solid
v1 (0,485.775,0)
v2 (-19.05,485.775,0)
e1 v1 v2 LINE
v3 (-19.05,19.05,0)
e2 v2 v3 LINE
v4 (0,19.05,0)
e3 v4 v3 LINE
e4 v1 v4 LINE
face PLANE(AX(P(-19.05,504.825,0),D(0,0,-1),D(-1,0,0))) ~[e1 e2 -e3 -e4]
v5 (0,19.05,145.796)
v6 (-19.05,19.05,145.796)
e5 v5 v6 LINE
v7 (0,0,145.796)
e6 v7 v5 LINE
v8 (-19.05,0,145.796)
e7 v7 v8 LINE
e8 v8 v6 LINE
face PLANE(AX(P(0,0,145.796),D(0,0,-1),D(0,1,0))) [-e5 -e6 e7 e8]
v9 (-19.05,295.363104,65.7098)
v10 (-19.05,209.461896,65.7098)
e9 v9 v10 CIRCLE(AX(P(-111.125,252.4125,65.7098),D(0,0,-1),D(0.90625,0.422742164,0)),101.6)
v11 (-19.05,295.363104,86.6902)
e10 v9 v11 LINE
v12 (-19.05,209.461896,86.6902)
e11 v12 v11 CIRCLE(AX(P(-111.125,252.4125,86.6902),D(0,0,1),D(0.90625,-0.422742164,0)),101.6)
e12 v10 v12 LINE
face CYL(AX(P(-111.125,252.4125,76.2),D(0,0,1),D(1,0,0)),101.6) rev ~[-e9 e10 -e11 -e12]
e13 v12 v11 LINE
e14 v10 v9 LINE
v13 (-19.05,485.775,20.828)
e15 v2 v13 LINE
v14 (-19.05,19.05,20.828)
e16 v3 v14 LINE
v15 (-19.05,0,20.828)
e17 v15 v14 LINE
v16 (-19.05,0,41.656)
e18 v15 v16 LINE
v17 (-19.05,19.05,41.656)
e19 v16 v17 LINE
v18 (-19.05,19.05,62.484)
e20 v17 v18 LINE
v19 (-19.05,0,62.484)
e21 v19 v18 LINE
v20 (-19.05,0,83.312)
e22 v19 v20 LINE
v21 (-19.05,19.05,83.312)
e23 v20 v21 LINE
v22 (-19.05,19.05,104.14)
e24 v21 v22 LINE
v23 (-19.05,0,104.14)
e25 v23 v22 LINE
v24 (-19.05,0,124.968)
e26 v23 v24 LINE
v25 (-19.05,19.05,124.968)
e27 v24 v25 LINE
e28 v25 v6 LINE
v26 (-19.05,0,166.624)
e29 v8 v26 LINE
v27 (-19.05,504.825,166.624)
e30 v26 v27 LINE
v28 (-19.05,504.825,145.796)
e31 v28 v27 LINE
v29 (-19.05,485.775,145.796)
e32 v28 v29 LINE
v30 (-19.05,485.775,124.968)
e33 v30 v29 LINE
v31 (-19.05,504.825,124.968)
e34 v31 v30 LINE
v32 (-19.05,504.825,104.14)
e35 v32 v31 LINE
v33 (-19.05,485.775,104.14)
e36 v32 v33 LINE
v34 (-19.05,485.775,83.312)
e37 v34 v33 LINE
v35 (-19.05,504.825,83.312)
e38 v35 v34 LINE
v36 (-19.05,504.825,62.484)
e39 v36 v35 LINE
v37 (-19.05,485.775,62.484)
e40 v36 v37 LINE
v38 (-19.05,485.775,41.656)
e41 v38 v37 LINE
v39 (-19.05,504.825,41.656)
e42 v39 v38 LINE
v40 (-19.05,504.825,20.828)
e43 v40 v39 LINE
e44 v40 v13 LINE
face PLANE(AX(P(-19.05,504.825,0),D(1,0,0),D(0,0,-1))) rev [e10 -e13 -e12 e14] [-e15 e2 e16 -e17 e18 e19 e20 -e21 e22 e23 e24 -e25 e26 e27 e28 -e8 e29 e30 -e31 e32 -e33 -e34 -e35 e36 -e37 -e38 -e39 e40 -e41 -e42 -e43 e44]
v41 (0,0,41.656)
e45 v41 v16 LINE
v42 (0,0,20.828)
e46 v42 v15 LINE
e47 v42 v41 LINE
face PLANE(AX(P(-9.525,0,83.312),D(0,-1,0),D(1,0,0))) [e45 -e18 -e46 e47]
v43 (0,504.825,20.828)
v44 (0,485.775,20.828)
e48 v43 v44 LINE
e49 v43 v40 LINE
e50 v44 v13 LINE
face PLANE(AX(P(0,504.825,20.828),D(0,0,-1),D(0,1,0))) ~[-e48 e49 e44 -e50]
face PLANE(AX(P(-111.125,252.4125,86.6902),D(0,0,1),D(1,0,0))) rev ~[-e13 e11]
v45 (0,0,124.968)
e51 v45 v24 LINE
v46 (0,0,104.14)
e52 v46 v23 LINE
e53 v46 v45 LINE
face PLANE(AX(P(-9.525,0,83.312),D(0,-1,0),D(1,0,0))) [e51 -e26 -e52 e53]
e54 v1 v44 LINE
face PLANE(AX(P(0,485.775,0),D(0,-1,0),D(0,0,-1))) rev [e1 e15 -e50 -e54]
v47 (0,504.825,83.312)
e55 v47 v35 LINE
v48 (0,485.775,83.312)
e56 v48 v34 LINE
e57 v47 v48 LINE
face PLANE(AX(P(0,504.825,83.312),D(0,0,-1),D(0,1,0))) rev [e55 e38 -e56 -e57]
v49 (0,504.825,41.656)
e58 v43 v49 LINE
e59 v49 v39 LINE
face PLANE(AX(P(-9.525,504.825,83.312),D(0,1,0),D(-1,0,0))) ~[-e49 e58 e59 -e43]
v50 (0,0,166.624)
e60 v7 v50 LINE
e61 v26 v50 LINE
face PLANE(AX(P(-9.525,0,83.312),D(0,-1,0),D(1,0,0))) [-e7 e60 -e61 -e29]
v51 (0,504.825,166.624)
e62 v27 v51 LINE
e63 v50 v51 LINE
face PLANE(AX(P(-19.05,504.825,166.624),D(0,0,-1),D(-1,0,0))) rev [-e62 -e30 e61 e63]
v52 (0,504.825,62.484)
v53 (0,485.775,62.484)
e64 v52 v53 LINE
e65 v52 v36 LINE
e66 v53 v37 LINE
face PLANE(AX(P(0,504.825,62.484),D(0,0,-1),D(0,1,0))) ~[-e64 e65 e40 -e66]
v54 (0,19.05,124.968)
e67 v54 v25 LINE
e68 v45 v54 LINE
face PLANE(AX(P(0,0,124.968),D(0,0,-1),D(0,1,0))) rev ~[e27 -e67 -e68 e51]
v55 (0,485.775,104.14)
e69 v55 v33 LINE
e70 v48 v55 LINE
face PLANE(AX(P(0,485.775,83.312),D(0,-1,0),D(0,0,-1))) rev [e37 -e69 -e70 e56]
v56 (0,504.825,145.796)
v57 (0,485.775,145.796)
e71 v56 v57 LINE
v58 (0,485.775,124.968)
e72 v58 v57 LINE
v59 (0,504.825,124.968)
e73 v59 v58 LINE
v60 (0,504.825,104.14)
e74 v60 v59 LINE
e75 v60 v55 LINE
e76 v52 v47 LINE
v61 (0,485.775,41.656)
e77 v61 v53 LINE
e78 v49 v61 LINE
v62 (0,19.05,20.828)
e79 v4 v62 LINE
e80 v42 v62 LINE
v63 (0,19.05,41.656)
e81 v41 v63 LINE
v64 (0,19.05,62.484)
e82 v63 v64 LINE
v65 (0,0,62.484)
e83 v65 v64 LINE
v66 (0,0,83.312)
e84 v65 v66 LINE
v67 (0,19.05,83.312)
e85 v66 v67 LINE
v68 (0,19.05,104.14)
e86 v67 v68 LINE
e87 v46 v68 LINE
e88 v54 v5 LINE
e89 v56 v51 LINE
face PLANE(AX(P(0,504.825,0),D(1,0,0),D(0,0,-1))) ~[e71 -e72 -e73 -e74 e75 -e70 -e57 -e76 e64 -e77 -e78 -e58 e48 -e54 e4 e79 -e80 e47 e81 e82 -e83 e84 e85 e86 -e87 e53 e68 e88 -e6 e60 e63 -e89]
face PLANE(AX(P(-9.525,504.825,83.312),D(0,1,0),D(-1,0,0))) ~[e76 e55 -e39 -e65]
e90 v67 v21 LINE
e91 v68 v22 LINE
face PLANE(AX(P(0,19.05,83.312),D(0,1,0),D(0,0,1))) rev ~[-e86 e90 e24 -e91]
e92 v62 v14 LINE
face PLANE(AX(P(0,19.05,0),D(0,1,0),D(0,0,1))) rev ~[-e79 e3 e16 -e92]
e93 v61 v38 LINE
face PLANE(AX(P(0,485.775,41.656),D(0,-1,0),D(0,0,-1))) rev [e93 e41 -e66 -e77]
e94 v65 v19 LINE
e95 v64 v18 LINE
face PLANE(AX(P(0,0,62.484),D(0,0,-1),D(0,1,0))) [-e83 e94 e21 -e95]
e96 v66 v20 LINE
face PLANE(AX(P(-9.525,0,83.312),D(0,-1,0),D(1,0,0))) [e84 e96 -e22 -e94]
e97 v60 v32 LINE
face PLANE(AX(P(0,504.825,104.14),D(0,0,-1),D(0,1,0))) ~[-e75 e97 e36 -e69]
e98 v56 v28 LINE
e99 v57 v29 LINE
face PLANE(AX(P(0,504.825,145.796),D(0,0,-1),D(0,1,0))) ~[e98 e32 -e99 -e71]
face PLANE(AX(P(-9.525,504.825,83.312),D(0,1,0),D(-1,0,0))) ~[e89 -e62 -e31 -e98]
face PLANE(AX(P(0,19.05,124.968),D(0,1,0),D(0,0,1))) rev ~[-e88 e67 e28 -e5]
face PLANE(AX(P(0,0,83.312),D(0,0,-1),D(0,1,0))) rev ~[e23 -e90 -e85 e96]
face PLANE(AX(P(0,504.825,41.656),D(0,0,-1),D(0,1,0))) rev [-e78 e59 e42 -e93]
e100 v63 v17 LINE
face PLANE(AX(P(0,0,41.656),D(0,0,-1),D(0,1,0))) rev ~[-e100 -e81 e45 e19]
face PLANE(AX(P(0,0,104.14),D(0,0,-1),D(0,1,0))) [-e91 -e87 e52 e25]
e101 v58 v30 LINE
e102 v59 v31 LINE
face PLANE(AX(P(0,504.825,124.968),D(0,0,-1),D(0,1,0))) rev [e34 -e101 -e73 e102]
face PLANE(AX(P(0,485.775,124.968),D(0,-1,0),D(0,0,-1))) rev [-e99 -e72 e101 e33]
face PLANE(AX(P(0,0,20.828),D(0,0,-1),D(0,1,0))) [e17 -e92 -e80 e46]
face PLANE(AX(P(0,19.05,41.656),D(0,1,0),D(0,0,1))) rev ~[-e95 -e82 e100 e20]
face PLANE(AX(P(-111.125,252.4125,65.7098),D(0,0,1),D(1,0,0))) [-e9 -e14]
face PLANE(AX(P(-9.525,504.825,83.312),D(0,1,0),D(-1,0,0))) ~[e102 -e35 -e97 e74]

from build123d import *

# Parameters (mm, degrees)
F0_W     = 19.05
F0_H     = 166.624
F1_DEPTH = 252.4125
F3_W     = 19.05
F3_H     = 20.828
F4_DEPTH = 19.051
F7_R     = 101.6
F8_DEPTH = 10.4902


# Not quite as in the source:
# - a length typed as a fraction of an inch, garbled in the dataset ("3 / 203.2 mm" for 3/8 in), is restored


with BuildPart() as f1:
    # F0 (on Front) → F1 (new body)
    with BuildSketch(Plane.XZ):
        with Locations((-9.525, 83.312)):
            Rectangle(F0_W, F0_H)
    extrude(amount=-F1_DEPTH)

    # F3 (on Right) → F4 (cut, through all)
    with BuildSketch(Plane.YZ):
        with Locations((9.525, 135.382)):
            Rectangle(F3_W, F3_H)
        with Locations((9.525, 93.726)):
            Rectangle(F3_W, F3_H)
        with Locations((9.525, 52.07)):
            Rectangle(F3_W, F3_H)
        with Locations((9.525, 10.414)):
            Rectangle(F3_W, F3_H)
    extrude(amount=-F4_DEPTH, mode=Mode.SUBTRACT)

    # F5: F1 across face


with BuildPart() as f1_1:
    add(f1.part)
    add(f1.part.mirror(Plane(origin=(-9.525, 252.4125, 83.312), x_dir=(1, 0, 0), z_dir=(0, 1, 0))))

    # F7 (on offset) → F8 (cut, symmetric)
    with BuildSketch(Plane.XY.offset(76.2)):
        with Locations((-111.125, 252.4125)):
            Circle(F7_R)
    extrude(amount=F8_DEPTH, both=True, mode=Mode.SUBTRACT)


solid = f1_1.part
